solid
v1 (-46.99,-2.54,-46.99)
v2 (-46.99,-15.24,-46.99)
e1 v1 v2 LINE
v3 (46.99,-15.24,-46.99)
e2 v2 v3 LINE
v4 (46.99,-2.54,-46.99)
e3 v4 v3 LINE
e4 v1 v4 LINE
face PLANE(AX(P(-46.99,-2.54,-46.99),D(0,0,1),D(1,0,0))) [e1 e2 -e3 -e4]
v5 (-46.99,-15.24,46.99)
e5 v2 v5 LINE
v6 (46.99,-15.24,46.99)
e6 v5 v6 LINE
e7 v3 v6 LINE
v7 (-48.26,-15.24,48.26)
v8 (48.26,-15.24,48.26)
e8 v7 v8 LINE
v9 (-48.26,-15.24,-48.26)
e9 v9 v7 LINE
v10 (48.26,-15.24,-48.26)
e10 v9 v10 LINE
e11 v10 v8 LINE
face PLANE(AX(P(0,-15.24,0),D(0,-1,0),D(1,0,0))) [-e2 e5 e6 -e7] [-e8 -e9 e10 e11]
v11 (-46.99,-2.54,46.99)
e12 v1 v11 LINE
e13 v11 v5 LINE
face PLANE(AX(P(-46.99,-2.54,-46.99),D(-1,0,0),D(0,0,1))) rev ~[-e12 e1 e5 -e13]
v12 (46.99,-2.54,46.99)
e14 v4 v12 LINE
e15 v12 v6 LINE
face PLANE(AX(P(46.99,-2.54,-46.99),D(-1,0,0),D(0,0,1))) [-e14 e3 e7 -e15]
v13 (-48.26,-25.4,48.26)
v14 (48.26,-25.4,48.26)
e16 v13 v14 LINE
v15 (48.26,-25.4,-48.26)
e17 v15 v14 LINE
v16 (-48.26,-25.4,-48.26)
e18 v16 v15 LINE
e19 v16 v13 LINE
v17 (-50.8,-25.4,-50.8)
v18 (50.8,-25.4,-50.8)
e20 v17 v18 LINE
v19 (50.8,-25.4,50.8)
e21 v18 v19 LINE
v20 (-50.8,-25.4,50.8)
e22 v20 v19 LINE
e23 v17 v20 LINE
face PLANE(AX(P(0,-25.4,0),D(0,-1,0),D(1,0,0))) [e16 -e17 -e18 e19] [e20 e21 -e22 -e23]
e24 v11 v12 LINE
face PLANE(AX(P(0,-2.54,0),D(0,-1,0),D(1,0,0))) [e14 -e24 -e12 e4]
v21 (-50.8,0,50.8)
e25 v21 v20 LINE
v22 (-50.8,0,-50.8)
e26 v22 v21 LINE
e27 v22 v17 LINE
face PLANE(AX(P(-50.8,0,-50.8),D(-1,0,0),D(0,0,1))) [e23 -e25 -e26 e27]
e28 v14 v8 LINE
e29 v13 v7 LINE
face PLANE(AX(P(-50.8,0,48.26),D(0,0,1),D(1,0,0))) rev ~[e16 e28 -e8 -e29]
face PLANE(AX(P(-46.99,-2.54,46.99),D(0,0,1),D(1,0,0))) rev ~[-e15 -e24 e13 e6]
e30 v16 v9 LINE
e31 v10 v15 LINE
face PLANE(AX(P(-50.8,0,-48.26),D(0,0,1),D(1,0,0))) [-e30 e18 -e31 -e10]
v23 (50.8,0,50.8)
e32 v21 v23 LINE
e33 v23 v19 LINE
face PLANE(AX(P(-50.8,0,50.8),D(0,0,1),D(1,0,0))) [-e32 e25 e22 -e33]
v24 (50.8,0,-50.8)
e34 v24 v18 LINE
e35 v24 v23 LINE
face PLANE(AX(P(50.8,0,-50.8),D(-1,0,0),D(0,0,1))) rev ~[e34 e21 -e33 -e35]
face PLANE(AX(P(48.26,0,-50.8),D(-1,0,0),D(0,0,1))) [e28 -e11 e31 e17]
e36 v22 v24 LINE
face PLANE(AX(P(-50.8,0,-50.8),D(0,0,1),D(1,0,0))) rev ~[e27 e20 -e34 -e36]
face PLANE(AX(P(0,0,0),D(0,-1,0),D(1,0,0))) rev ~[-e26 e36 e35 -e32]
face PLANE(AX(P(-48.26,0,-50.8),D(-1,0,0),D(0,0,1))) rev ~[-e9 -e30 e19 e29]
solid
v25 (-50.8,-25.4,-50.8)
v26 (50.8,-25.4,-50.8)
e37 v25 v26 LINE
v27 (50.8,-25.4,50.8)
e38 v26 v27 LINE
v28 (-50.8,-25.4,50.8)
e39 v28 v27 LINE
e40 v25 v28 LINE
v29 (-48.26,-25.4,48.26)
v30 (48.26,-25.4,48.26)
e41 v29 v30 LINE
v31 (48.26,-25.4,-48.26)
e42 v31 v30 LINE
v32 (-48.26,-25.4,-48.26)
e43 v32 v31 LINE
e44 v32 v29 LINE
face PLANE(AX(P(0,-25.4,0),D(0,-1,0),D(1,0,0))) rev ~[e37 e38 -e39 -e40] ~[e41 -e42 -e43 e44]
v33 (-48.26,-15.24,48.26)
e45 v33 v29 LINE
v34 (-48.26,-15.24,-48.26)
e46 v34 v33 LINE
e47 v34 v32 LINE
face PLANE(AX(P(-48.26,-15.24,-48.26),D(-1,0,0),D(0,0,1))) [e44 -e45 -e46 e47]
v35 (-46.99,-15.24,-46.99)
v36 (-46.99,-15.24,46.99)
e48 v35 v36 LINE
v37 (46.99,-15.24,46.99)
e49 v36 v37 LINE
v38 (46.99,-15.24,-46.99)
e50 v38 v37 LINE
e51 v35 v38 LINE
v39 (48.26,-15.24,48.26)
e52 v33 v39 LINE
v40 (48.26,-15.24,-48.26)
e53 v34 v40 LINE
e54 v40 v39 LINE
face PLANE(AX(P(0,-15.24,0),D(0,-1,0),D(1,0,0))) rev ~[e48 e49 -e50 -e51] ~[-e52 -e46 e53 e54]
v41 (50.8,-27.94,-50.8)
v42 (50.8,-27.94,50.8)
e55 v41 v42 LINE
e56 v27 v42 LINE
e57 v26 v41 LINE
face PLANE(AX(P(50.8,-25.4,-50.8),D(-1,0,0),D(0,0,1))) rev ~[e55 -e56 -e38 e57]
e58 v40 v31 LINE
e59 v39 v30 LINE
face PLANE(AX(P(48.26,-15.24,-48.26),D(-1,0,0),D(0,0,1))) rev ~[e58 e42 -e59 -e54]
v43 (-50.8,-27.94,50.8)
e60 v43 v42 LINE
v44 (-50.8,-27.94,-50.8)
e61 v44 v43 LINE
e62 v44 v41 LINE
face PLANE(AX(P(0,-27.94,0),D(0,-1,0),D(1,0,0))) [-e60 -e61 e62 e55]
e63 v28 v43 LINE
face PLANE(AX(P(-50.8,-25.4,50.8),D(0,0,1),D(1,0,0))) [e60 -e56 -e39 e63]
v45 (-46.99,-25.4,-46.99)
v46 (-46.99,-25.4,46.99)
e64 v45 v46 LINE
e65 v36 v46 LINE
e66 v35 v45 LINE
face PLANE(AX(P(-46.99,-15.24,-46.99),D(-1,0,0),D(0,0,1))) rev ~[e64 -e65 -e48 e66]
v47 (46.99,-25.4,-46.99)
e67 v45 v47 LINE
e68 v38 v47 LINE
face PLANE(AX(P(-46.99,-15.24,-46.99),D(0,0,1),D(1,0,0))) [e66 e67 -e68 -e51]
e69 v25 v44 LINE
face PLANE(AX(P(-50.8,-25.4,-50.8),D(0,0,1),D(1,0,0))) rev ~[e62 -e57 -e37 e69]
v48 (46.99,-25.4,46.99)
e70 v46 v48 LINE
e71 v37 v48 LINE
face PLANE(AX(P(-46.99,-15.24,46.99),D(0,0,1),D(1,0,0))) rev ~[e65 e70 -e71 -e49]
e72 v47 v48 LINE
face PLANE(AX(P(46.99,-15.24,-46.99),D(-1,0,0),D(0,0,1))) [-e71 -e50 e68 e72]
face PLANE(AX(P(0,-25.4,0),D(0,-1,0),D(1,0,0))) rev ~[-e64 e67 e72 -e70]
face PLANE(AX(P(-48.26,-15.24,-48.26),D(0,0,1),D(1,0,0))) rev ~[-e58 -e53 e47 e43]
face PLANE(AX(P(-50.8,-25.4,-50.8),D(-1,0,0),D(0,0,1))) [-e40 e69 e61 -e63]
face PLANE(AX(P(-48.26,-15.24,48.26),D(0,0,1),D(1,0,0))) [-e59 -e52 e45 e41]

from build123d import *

# Parameters (mm, degrees)
F0_W     = 101.6
F0_H     = 101.6
F1_DEPTH = 25.4
F5_T     = -2.54
F2_W     = 96.52
F2_H     = 96.52
F2_W_2   = 93.98
F2_H_2   = 93.98
F3_DEPTH = 12.7
F6_DEPTH = 12.7
F4_W     = 101.6
F4_H     = 101.6
F4_W_2   = 96.52
F4_H_2   = 96.52
F7_DEPTH = 2.54


with BuildPart() as f1:
    # F0 (on Front) → F1 (new body)
    with BuildSketch(Plane.XZ):
        Rectangle(F0_W, F0_H)
    extrude(amount=F1_DEPTH)

    # F5
    f5_openings = [f1.faces().sort_by_distance(p)[0] for p in [
        (0, -25.4, 0),
    ]]
    offset(amount=F5_T, openings=f5_openings)

    # F2 (on face) → F3 (join)
    with BuildSketch(Plane.XZ.offset(2.54)):
        Rectangle(F2_W, F2_H)
        Rectangle(F2_W_2, F2_H_2, mode=Mode.SUBTRACT)
    extrude(amount=F3_DEPTH)


with BuildPart() as f6:
    # F6 (new): a face of the model
    f6_faces = [f1.part.faces().sort_by_distance(p)[0] for p in [
        (-48.123500107, -15.24, 0),
    ]]
    extrude(f6_faces, amount=F6_DEPTH)

    # F4 (on face) → F7 (join)
    with BuildSketch(Plane.XZ.offset(25.4)):
        Rectangle(F4_W, F4_H)
        Rectangle(F4_W_2, F4_H_2)
    extrude(amount=F7_DEPTH)


solid = Compound([f1.part, f6.part])
